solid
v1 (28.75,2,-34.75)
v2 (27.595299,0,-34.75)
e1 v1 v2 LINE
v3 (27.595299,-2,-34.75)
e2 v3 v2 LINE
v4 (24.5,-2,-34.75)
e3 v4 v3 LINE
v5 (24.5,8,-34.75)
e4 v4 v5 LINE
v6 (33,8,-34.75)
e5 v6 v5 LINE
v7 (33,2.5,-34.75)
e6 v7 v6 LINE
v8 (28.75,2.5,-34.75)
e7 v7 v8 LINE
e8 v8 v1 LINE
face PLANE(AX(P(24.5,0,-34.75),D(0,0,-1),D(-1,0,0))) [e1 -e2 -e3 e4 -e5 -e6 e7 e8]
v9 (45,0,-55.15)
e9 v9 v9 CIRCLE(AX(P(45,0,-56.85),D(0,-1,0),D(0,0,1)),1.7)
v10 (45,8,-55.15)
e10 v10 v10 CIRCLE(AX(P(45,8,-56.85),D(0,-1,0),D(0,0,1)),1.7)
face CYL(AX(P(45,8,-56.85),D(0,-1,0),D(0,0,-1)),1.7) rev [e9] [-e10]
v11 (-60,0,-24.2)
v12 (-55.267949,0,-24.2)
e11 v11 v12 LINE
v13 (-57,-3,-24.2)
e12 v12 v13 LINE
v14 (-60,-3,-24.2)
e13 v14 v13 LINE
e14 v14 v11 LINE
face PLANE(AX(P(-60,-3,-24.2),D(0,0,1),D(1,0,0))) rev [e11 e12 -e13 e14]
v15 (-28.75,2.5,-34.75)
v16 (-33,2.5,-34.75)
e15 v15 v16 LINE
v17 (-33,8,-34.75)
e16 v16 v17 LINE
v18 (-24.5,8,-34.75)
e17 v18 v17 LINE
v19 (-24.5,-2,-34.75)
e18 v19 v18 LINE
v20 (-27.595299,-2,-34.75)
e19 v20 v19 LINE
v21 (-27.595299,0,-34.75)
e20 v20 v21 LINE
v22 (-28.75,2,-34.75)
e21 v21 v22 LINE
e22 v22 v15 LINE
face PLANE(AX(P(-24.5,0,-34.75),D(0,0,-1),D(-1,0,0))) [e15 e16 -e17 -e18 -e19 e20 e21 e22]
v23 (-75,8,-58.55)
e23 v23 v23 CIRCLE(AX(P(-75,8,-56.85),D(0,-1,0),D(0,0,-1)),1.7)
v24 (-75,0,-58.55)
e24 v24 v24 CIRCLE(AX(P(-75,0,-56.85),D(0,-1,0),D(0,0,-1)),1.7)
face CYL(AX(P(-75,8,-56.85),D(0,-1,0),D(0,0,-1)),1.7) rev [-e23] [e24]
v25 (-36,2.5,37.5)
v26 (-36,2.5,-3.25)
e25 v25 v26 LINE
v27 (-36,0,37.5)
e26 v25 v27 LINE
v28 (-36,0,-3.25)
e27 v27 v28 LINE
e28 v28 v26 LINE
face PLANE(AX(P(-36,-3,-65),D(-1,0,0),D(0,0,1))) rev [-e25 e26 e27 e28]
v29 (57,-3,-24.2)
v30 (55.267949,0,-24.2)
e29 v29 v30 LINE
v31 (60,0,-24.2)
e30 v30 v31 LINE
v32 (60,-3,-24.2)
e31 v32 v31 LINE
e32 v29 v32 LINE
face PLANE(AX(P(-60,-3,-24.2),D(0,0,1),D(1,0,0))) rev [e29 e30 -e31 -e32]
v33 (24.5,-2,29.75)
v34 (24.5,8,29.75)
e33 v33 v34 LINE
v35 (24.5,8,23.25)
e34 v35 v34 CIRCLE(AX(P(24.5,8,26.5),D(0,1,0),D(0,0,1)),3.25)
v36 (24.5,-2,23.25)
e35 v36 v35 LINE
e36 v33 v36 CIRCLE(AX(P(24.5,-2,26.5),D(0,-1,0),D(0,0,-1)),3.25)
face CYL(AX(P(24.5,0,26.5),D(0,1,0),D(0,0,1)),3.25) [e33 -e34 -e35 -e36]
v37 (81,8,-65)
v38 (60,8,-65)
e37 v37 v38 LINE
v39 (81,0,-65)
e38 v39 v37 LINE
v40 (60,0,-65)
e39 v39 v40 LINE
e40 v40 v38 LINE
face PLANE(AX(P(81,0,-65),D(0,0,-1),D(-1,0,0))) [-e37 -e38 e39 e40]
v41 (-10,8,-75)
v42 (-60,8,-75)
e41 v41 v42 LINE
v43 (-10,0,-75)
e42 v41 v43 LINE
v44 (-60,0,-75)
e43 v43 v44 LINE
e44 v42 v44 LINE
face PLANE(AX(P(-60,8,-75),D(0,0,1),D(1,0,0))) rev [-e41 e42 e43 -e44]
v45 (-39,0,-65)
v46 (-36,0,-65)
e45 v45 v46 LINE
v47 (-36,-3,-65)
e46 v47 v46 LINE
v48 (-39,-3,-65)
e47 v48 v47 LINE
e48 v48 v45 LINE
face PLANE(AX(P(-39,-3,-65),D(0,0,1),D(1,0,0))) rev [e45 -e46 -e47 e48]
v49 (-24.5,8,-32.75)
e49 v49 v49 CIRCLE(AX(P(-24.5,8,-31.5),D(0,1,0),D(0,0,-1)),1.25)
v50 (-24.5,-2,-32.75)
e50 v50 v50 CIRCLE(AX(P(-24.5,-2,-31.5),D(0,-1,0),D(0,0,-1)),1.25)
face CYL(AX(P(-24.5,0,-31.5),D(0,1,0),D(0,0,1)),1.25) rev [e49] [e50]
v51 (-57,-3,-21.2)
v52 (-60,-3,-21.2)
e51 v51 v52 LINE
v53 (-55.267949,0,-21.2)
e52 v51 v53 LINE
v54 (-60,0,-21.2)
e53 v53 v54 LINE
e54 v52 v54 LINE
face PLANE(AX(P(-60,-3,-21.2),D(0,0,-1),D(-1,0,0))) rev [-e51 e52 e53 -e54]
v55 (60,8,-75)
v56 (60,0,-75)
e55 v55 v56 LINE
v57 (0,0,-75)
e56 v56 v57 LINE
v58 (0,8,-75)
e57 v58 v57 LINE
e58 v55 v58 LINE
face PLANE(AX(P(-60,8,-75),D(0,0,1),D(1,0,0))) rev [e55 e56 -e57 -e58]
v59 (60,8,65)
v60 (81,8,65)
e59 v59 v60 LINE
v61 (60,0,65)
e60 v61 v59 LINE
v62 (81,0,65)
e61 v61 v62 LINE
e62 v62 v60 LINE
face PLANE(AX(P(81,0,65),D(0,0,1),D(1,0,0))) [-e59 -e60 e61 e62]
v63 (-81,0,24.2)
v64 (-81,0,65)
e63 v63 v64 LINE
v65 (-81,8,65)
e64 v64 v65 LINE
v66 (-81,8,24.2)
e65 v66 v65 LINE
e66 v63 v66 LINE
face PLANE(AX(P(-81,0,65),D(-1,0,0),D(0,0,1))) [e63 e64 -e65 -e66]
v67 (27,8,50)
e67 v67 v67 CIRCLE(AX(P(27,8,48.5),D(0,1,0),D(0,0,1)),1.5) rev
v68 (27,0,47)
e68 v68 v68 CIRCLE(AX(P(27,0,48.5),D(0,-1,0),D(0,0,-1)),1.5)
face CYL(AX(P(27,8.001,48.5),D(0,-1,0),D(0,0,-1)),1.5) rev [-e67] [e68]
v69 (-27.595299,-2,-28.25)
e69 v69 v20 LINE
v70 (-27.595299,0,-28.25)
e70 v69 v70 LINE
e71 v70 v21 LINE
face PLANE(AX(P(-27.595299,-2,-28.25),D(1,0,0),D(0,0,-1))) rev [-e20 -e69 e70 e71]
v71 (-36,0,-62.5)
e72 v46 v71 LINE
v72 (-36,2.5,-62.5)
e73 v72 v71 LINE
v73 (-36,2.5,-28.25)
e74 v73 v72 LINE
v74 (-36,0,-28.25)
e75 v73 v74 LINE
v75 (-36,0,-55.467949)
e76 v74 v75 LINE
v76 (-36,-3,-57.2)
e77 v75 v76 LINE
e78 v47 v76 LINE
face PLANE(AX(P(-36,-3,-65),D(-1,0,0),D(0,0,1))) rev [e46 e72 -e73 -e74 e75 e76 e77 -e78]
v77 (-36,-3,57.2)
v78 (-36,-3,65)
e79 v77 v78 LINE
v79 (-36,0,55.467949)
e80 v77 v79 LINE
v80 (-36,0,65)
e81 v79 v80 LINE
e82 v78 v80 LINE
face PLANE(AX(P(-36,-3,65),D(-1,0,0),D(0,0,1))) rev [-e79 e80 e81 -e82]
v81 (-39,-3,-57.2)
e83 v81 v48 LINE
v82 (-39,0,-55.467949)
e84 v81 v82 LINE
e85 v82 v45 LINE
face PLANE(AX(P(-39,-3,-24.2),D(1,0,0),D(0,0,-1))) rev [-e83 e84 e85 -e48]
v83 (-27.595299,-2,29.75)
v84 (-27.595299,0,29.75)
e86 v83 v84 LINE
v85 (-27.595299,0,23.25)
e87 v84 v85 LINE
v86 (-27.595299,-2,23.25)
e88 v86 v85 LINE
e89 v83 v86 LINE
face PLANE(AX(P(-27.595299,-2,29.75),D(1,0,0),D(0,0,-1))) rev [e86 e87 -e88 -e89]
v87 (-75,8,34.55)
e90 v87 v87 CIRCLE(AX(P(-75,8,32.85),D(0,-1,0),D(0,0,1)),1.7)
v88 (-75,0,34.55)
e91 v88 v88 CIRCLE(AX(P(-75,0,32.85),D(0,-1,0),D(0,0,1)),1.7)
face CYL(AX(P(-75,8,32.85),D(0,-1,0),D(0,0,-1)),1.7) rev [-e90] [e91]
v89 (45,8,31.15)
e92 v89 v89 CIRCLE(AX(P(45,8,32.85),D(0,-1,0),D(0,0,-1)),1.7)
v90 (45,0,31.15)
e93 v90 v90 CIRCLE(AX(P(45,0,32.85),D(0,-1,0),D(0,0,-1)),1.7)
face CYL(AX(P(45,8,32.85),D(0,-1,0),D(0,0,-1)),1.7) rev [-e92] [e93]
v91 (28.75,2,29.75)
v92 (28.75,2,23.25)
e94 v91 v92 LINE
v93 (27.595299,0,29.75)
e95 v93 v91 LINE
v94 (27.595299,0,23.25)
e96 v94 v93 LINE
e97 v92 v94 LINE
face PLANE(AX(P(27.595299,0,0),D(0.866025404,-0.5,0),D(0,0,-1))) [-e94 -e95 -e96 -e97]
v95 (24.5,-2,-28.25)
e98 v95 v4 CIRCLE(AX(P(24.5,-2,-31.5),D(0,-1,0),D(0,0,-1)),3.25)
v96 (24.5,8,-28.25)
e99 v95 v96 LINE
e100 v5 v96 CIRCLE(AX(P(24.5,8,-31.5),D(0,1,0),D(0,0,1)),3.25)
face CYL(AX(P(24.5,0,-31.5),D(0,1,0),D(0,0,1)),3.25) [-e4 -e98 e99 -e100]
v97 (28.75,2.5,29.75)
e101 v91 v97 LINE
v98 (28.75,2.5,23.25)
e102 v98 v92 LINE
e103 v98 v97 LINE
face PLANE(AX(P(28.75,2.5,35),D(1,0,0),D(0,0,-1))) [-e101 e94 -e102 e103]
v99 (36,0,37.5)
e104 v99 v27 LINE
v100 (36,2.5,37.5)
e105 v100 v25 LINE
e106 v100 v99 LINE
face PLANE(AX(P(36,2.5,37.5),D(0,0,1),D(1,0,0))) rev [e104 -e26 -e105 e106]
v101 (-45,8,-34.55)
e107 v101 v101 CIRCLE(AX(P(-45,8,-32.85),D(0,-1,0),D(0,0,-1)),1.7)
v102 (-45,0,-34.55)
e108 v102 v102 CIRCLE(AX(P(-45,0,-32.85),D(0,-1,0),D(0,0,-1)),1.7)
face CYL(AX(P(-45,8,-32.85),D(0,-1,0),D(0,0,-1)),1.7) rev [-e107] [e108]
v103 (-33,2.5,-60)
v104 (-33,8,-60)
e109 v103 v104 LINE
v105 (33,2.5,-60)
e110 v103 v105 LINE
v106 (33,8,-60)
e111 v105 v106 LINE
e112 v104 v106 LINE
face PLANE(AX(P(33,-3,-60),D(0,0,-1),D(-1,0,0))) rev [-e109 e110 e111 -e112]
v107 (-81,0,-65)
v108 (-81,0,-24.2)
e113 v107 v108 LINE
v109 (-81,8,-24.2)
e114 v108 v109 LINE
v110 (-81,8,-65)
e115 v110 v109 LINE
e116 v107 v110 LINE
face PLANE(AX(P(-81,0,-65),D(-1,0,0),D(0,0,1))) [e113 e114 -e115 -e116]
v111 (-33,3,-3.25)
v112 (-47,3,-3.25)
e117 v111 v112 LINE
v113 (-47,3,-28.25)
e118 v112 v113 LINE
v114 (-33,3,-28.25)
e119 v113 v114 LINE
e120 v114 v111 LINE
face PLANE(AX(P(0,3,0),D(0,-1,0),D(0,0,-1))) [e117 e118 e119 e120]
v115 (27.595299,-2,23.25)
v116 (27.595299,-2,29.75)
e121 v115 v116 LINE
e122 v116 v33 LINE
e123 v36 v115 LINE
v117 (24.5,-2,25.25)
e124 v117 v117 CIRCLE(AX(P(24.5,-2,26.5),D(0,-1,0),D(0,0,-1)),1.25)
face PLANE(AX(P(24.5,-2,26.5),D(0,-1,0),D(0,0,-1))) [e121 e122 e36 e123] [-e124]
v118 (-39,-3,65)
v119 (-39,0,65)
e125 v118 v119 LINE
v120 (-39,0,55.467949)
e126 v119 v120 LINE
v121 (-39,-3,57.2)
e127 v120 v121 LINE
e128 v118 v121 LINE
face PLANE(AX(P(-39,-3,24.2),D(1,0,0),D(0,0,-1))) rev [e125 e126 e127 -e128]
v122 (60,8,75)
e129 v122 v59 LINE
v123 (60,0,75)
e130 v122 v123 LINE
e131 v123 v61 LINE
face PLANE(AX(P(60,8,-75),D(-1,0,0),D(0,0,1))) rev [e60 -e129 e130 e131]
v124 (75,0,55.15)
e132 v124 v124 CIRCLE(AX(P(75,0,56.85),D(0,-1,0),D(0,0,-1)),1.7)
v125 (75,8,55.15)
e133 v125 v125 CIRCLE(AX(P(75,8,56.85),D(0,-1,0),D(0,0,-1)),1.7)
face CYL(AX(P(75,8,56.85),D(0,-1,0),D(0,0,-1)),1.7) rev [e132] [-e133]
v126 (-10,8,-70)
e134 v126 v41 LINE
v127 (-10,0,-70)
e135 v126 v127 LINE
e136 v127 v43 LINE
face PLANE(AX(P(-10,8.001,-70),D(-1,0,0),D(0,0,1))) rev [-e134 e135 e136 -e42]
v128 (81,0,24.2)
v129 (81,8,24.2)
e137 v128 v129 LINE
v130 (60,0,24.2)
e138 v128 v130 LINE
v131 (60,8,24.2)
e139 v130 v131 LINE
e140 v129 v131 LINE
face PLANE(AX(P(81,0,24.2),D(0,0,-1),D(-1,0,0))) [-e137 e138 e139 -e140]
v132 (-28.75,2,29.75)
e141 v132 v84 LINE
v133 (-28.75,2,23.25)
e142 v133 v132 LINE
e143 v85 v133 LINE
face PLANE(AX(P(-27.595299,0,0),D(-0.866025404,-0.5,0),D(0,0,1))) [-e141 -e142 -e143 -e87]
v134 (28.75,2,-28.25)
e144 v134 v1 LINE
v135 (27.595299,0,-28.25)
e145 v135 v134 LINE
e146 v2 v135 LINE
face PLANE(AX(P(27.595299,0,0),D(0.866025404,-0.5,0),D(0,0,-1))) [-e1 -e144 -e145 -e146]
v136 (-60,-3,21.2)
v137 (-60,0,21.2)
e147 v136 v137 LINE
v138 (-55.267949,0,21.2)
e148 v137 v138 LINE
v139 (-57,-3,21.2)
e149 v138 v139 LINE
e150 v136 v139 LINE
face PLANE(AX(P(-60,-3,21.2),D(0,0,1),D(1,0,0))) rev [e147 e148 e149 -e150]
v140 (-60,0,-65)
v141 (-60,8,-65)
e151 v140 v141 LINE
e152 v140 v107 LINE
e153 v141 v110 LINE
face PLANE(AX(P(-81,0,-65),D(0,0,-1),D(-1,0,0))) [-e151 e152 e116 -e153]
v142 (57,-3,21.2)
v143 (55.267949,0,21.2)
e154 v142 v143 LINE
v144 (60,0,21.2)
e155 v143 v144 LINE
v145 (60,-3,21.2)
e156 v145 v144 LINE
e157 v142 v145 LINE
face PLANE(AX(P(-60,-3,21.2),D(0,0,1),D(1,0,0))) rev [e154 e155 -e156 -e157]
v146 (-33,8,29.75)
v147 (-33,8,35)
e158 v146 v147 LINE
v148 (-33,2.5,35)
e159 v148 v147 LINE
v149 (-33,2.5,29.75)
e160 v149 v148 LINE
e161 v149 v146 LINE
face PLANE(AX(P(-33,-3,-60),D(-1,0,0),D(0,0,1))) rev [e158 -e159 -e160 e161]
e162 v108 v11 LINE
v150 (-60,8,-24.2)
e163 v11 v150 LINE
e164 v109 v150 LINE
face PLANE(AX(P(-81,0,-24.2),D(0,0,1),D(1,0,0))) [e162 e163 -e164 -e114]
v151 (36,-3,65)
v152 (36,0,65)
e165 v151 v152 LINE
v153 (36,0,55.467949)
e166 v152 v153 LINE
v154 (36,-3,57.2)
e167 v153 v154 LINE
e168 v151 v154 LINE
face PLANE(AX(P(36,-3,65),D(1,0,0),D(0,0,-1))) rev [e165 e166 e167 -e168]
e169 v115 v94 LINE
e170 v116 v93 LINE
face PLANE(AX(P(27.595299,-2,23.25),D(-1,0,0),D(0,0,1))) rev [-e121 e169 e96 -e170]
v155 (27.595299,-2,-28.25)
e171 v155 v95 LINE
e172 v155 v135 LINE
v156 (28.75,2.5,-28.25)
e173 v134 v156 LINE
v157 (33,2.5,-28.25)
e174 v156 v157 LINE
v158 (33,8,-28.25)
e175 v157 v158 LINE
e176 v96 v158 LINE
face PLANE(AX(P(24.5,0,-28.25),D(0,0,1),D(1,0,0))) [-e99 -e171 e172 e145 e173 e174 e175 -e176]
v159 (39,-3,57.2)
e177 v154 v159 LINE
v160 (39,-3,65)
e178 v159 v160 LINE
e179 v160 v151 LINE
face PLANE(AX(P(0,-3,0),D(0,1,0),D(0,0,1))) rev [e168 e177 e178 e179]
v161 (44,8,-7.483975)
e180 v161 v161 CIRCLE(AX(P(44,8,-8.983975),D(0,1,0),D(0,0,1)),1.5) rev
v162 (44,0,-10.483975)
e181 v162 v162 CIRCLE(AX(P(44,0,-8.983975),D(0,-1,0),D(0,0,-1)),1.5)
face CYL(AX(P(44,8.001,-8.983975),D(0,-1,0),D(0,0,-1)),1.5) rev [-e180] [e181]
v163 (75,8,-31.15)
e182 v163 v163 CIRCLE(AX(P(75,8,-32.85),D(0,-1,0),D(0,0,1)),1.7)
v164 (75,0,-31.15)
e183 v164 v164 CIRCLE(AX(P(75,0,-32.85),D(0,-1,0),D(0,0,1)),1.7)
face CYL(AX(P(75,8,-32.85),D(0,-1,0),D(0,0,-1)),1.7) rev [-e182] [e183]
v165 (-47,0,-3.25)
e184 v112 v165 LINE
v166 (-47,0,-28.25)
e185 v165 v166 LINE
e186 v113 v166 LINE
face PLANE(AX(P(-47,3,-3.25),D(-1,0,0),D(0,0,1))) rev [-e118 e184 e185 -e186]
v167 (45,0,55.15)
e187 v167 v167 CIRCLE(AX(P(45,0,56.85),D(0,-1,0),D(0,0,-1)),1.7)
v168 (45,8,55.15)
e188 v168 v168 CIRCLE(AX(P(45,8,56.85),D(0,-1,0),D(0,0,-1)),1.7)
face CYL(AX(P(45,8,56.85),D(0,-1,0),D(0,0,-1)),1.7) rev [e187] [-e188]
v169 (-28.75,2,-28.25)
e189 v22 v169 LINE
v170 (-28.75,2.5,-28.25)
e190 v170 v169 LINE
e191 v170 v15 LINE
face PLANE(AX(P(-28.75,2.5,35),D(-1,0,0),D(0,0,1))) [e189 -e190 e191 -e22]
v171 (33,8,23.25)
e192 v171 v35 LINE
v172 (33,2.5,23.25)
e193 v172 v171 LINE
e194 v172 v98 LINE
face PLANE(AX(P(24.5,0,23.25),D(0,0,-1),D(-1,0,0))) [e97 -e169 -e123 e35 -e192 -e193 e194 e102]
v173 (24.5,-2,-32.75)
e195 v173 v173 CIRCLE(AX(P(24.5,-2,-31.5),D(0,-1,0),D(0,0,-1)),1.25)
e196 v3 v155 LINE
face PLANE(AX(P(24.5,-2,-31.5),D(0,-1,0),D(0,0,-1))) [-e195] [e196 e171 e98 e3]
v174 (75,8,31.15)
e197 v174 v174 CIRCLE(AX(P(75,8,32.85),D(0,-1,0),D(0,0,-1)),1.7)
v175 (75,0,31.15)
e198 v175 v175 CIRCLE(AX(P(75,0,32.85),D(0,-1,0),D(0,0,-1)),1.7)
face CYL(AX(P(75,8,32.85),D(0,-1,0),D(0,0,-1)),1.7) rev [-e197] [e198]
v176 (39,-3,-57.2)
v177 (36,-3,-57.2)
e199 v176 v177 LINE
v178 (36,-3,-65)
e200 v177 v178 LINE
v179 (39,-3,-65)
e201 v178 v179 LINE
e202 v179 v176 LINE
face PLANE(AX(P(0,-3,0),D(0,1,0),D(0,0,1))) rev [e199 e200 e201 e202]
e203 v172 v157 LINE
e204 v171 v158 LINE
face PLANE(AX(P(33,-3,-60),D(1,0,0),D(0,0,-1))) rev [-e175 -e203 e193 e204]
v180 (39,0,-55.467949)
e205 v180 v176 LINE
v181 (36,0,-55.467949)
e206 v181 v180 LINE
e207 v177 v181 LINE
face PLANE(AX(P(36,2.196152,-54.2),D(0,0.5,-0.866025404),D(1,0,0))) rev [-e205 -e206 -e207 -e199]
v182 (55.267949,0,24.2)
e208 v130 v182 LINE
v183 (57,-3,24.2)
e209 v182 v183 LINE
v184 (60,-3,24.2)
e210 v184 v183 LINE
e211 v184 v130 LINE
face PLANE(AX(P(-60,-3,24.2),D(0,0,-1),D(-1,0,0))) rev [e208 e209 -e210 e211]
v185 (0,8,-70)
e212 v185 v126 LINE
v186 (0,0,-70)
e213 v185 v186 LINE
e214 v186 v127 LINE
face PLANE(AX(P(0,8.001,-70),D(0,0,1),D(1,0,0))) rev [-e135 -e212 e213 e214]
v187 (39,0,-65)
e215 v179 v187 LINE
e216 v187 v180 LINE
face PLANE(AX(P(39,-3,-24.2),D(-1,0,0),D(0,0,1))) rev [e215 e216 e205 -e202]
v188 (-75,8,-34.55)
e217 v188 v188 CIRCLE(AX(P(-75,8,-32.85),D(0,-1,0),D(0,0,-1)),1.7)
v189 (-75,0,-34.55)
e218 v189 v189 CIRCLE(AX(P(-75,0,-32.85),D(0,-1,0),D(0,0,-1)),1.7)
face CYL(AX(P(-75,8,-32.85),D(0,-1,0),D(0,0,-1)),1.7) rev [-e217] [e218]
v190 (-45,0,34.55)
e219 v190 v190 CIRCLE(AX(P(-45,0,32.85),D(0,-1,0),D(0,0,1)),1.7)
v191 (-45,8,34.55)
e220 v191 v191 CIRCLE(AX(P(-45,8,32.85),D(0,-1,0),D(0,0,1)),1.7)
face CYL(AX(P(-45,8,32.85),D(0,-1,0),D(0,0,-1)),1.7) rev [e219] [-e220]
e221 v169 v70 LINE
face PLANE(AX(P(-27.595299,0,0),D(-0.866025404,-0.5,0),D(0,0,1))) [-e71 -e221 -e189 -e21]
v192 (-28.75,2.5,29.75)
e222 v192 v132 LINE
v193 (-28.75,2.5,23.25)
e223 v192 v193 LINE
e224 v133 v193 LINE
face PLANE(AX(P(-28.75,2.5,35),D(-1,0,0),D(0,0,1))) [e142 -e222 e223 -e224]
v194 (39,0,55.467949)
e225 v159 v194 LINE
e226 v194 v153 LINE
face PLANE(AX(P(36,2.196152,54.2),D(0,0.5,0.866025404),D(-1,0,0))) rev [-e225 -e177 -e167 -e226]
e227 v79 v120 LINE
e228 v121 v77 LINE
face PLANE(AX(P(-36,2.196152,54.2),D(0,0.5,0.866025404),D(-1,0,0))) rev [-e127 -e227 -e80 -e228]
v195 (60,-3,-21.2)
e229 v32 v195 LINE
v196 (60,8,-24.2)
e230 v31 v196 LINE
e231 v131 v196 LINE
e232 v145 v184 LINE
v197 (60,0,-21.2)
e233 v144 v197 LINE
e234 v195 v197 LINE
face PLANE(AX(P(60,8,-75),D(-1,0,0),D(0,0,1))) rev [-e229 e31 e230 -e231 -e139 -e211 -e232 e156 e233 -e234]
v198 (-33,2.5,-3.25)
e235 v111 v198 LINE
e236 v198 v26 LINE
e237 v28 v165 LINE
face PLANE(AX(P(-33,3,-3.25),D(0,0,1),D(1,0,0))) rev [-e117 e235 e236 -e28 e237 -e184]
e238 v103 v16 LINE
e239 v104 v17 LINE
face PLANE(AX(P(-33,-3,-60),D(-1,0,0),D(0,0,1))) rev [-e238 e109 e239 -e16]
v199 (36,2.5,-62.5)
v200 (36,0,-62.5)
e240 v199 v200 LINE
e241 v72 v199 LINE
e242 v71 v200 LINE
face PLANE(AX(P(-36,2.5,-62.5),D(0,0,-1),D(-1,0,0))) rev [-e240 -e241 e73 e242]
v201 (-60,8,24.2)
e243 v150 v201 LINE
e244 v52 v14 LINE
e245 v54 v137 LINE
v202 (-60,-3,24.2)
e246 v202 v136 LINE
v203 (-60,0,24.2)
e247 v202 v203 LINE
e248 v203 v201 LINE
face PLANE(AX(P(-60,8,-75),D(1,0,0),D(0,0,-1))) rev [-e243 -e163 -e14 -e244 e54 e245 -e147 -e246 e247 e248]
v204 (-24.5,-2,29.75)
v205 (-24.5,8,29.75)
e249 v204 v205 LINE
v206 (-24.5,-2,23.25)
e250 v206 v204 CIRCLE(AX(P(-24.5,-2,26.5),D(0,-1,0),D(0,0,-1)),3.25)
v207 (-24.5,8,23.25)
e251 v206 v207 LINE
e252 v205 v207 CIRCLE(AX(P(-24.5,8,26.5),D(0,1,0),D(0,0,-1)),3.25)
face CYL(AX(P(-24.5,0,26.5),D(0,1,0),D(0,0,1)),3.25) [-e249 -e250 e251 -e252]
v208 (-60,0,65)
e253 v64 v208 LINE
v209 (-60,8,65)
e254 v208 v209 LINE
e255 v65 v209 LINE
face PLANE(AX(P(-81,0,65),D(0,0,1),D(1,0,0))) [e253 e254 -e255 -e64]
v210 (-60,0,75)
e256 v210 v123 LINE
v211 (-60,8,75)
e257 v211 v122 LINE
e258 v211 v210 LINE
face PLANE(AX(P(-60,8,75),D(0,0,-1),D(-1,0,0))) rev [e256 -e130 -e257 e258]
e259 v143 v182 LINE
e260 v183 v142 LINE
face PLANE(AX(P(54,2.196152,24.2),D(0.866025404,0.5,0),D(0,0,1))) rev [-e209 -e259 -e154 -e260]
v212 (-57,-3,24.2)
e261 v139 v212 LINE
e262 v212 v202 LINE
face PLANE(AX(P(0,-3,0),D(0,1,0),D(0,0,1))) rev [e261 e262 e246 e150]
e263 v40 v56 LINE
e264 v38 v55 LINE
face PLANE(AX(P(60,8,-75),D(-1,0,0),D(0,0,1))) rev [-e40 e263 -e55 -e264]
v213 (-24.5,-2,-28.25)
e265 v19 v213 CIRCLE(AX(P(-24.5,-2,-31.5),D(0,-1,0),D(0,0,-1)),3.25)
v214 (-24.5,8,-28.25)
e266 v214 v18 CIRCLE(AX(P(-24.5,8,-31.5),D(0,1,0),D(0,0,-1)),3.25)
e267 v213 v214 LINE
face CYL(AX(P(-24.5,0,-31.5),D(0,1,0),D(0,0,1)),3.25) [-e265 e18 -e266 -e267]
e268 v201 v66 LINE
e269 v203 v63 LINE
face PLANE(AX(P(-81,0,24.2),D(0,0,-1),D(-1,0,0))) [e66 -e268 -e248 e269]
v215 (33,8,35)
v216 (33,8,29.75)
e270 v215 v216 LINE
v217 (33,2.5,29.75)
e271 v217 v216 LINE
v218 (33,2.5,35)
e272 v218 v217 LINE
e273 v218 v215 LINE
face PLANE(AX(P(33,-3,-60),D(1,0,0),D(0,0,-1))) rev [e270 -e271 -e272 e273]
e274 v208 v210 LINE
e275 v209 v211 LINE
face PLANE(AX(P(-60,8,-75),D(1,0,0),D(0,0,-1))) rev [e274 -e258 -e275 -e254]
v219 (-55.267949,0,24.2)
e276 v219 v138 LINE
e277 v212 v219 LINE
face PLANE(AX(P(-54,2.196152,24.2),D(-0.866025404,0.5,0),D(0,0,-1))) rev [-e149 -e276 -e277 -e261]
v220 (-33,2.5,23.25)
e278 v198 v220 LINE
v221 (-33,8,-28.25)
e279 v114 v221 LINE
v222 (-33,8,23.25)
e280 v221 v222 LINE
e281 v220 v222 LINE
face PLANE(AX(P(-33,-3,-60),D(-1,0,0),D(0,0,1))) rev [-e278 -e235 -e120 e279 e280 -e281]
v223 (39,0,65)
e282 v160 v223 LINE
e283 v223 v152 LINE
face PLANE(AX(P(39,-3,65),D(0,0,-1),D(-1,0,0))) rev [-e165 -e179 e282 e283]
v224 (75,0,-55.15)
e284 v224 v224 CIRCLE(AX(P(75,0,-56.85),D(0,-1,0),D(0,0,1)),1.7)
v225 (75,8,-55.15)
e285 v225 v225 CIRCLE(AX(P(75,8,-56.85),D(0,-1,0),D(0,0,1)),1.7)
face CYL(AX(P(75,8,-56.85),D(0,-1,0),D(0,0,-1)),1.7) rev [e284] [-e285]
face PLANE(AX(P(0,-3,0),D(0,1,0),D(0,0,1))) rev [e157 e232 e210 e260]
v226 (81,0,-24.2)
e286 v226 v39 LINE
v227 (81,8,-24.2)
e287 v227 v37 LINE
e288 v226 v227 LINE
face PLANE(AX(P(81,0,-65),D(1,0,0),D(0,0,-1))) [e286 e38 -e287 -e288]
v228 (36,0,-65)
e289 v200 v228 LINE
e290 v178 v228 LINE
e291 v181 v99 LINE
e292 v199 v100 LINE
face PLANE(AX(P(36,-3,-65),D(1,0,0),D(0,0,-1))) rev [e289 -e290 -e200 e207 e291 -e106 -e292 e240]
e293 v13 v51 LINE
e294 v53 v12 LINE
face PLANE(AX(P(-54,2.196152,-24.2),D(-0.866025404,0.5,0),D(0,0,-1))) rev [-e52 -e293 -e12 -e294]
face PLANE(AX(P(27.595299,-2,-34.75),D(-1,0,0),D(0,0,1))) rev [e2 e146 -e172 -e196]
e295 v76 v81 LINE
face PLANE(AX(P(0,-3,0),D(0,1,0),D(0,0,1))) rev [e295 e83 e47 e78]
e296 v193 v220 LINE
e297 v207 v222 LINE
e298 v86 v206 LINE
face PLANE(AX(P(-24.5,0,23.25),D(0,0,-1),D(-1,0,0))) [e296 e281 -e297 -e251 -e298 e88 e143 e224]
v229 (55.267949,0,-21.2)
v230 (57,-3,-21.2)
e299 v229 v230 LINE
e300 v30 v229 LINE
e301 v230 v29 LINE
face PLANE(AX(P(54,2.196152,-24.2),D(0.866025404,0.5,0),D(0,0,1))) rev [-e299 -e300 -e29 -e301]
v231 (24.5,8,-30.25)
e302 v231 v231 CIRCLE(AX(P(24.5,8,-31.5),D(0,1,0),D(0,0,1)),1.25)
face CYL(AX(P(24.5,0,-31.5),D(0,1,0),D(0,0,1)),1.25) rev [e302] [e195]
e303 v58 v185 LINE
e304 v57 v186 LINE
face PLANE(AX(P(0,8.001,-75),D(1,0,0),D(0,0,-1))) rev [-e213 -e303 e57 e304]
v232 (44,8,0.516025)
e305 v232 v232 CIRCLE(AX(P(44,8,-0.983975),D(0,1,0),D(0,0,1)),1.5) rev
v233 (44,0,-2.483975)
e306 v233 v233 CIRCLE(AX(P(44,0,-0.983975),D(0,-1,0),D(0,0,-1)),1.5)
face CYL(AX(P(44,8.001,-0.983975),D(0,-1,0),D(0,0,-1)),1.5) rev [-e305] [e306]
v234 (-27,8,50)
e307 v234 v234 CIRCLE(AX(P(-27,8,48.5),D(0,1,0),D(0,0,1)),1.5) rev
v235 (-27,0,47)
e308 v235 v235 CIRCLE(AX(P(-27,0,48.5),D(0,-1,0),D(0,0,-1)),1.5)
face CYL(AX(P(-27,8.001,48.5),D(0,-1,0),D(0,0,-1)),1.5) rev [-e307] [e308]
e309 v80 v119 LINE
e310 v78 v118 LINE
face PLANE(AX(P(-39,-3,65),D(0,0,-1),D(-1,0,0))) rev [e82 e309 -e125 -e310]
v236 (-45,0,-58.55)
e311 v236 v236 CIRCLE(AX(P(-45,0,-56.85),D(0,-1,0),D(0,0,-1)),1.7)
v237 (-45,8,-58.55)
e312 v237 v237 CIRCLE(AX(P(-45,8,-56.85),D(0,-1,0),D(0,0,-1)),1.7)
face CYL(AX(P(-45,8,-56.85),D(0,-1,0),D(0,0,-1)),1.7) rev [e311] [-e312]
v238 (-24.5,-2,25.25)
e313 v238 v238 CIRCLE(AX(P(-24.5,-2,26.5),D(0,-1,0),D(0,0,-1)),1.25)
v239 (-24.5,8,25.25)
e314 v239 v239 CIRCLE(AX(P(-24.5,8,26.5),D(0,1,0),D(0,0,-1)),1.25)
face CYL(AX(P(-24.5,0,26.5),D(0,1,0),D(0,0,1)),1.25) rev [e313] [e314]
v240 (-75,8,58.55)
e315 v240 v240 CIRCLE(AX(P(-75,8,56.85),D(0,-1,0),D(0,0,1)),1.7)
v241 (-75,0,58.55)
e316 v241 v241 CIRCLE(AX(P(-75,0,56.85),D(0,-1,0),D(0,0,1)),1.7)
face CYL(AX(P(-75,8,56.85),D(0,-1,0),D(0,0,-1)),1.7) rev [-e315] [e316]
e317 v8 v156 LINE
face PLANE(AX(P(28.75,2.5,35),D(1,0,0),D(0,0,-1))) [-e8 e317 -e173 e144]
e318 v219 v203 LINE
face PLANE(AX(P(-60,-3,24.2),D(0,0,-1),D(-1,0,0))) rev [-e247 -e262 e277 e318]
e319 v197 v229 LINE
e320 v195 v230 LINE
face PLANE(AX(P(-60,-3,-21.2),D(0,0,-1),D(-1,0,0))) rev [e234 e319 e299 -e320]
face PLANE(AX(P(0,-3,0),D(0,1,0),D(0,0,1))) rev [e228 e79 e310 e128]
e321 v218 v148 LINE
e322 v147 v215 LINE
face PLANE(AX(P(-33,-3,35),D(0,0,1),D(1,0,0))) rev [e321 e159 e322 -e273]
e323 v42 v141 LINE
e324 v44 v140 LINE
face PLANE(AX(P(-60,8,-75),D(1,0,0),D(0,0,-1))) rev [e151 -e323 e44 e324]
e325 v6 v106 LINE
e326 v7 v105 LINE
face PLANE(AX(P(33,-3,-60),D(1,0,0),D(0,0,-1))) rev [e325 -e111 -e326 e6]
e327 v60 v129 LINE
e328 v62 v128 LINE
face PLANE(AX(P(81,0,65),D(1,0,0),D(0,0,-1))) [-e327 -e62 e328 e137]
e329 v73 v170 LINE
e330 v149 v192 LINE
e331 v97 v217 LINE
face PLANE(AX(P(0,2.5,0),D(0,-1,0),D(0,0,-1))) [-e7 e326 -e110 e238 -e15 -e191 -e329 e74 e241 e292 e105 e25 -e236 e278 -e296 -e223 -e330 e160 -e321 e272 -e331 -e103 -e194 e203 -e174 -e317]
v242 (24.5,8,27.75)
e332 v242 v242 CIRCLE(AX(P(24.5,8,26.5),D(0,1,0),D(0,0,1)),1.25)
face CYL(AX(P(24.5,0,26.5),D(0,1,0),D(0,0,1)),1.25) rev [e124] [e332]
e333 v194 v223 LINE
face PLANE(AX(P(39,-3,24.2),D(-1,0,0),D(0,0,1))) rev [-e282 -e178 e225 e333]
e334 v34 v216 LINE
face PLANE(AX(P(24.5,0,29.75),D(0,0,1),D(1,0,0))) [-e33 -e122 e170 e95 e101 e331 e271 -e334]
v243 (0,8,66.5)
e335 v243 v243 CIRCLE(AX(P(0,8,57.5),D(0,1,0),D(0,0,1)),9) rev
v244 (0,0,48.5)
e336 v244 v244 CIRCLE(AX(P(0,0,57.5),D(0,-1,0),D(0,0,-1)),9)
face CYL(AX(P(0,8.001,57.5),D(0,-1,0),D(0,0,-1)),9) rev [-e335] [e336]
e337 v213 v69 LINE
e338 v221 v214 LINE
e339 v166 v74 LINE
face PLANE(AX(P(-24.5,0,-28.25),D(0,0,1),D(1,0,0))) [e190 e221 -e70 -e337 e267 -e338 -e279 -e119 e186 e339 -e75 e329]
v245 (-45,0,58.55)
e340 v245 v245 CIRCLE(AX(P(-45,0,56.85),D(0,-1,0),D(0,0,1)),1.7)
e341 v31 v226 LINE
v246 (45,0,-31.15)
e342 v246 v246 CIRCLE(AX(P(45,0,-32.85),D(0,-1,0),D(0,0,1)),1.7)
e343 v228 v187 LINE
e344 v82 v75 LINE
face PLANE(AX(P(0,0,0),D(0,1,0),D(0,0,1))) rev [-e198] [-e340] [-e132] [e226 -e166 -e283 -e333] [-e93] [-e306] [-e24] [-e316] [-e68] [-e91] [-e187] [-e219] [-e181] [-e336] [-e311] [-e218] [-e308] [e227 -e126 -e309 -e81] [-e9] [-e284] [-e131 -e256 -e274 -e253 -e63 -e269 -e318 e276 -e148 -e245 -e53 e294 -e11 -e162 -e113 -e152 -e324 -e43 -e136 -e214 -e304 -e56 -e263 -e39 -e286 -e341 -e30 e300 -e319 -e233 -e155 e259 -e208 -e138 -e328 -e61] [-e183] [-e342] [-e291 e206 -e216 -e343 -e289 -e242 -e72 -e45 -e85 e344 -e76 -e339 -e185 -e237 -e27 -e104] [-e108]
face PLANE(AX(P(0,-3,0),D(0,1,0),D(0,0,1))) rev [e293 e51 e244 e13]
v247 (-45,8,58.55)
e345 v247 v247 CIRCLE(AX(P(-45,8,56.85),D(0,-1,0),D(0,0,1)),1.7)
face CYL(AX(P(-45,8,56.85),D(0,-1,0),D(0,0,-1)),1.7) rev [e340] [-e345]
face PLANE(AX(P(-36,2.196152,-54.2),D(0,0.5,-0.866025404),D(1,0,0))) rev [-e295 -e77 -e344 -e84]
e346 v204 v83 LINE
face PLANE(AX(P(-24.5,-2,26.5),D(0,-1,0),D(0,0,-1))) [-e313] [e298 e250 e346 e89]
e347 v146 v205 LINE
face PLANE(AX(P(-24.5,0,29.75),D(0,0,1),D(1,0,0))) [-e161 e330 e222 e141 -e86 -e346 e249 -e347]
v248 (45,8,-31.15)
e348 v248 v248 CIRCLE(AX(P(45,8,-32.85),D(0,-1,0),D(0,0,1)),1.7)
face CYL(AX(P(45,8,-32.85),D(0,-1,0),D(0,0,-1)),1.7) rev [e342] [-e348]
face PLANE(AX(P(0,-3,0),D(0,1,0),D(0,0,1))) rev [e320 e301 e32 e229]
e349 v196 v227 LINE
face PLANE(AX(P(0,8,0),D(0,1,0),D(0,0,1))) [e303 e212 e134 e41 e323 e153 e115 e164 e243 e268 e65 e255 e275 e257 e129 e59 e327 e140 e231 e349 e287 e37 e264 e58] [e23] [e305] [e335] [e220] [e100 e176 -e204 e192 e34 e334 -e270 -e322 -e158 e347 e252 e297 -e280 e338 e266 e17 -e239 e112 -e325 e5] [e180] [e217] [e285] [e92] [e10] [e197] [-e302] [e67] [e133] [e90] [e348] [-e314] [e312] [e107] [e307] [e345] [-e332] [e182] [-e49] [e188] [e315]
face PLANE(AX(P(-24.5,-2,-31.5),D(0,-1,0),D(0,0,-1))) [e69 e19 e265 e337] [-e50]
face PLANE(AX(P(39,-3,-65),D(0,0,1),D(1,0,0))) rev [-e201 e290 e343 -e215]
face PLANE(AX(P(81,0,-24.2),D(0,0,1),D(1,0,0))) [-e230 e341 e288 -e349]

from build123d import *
from OCP.BRepFilletAPI import BRepFilletAPI_MakeChamfer

# Parameters (mm, degrees)
SKETCH_1_W          = 120
SKETCH_1_H          = 150
EXTRUDE_1_DEPTH     = 8
SKETCH_3_W          = 120
SKETCH_3_H          = 3
EXTRUDE_2_DEPTH     = 3
SKETCH_5_W          = 66
SKETCH_5_H          = 95
CUT_EXTRUDE_1_DEPTH = 97.674712309
SKETCH_6_W          = 3
SKETCH_6_H          = 40.8
EXTRUDE_3_DEPTH     = 3
SKETCH_7_W          = 21
SKETCH_7_H          = 40.8
EXTRUDE_4_DEPTH     = 8
SKETCH_8_R          = 1.7
CUT_EXTRUDE_2_DEPTH = 8
SKETCH_9_R          = 1.25
EXTRUDE_5_DEPTH     = 8
SKETCH_10_W         = 66
SKETCH_10_H         = 20
EXTRUDE_6_DEPTH     = 2
CUT_EXTRUDE_3_DEPTH = 3
CUT_EXTRUDE_4_REACH = 112.756
SKETCH_12_W         = 66
SKETCH_12_H         = 20
SKETCH_13_W         = 72
SKETCH_13_H         = 100
SKETCH_13_W_2       = 57.5
SKETCH_13_H_2       = 95
CUT_EXTRUDE_5_DEPTH = 2.5
CHAMFER_1_SIZE      = 2
CHAMFER_1_SIZE2     = 1.154700538
CHAMFER_2_SIZE      = 5.196152423
CHAMFER_2_SIZE_2    = 3
SKETCH_14_W         = 14
SKETCH_14_H         = 25
CUT_EXTRUDE_6_DEPTH = 3
SKETCH_15_R         = 1.25
EXTRUDE_8_DEPTH     = 2
CUT_EXTRUDE_7_REACH = 112.68
SKETCH_16_R         = 9
SKETCH_16_W         = 10
SKETCH_16_H         = 5
CUT_EXTRUDE_8_REACH = 112.68
SKETCH_17_R         = 1.5
CUT_EXTRUDE_9_REACH = 112.68
SKETCH_18_R         = 1.5


with BuildPart() as part:
    # 草图1 → 凸台-拉伸1 (new body)
    with BuildSketch(Plane(origin=(0, 0, 0), x_dir=(1, 0, 0), z_dir=(0, 1, 0))):
        Rectangle(SKETCH_1_W, SKETCH_1_H)
    extrude(amount=EXTRUDE_1_DEPTH)

    # 草图3 → 凸台-拉伸2 (add)
    with BuildSketch(Plane.XZ):
        with Locations((0, 22.7)):
            Rectangle(SKETCH_3_W, SKETCH_3_H)
        with Locations((0, -22.7)):
            Rectangle(SKETCH_3_W, SKETCH_3_H)
    extrude(amount=EXTRUDE_2_DEPTH)

    # 草图5 → 切除-拉伸1 (cut, through all)
    with BuildSketch(Plane(origin=(0, 8, 0), x_dir=(1, 0, 0), z_dir=(0, 1, 0))):
        with Locations((0, 12.5)):
            Rectangle(SKETCH_5_W, SKETCH_5_H)
    extrude(amount=-CUT_EXTRUDE_1_DEPTH, mode=Mode.SUBTRACT)

    # 草图6 → 凸台-拉伸3 (add)
    with BuildSketch(Plane.XZ):
        with Locations((-37.5, -44.6)):
            Rectangle(SKETCH_6_W, SKETCH_6_H)
        with Locations((37.5, -44.6)):
            Rectangle(SKETCH_6_W, SKETCH_6_H)
        with Locations((37.5, 44.6)):
            Rectangle(SKETCH_6_W, SKETCH_6_H)
        with Locations((-37.5, 44.6)):
            Rectangle(SKETCH_6_W, SKETCH_6_H)
    extrude(amount=EXTRUDE_3_DEPTH)

    # 草图7 → 凸台-拉伸4 (add)
    with BuildSketch(Plane(origin=(0, 8, 0), x_dir=(1, 0, 0), z_dir=(0, 1, 0))):
        with Locations((-70.5, 44.6)):
            Rectangle(SKETCH_7_W, SKETCH_7_H)
        with Locations((70.5, 44.6)):
            Rectangle(SKETCH_7_W, SKETCH_7_H)
        with Locations((70.5, -44.6)):
            Rectangle(SKETCH_7_W, SKETCH_7_H)
        with Locations((-70.5, -44.6)):
            Rectangle(SKETCH_7_W, SKETCH_7_H)
    extrude(amount=-EXTRUDE_4_DEPTH)

    # 草图8 → 切除-拉伸2 (cut)
    with BuildSketch(Plane.XZ):
        with Locations(Location((-75, -32.85, 0), (0, 0, 270))):
            Circle(SKETCH_8_R)
        with Locations(Location((-45, -32.85, 0), (0, 0, 270))):
            Circle(SKETCH_8_R)
        with Locations(Location((-75, -56.85, 0), (0, 0, 270))):
            Circle(SKETCH_8_R)
        with Locations(Location((-45, -56.85, 0), (0, 0, 270))):
            Circle(SKETCH_8_R)
        with Locations(Location((45, -56.85, 0), (0, 0, 90))):
            Circle(SKETCH_8_R)
        with Locations(Location((75, -56.85, 0), (0, 0, 90))):
            Circle(SKETCH_8_R)
        with Locations(Location((45, -32.85, 0), (0, 0, 90))):
            Circle(SKETCH_8_R)
        with Locations(Location((75, -32.85, 0), (0, 0, 90))):
            Circle(SKETCH_8_R)
        with Locations(Location((75, 32.85, 0), (0, 0, 270))):
            Circle(SKETCH_8_R)
        with Locations(Location((45, 32.85, 0), (0, 0, 270))):
            Circle(SKETCH_8_R)
        with Locations(Location((75, 56.85, 0), (0, 0, 270))):
            Circle(SKETCH_8_R)
        with Locations(Location((45, 56.85, 0), (0, 0, 270))):
            Circle(SKETCH_8_R)
        with Locations(Location((-45, 56.85, 0), (0, 0, 90))):
            Circle(SKETCH_8_R)
        with Locations(Location((-75, 56.85, 0), (0, 0, 90))):
            Circle(SKETCH_8_R)
        with Locations(Location((-45, 32.85, 0), (0, 0, 90))):
            Circle(SKETCH_8_R)
        with Locations(Location((-75, 32.85, 0), (0, 0, 90))):
            Circle(SKETCH_8_R)
    extrude(amount=-CUT_EXTRUDE_2_DEPTH, mode=Mode.SUBTRACT)

    # 草图9 → 凸台-拉伸5 (add)
    # profile 1 of 4: a face of its own
    with BuildSketch(Plane(origin=(0, 8, 0), x_dir=(1, 0, 0), z_dir=(0, 1, 0))):
        with BuildLine():
            Line((24.5, 34.75), (33, 34.75))
            Line((33, 34.75), (33, 28.25))
            Line((33, 28.25), (24.5, 28.25))
            ThreePointArc((24.5, 28.25), (21.25, 31.5), (24.5, 34.75))
        make_face()
        with Locations(Location((24.5, 31.5, 0), (0, 0, 270))):
            Circle(SKETCH_9_R, mode=Mode.SUBTRACT)
    # profile 2 of 4: a face of its own
    with BuildSketch(Plane(origin=(0, 8, 0), x_dir=(1, 0, 0), z_dir=(0, 1, 0))):
        with BuildLine():
            Line((24.5, -23.25), (33, -23.25))
            Line((33, -23.25), (33, -29.75))
            Line((33, -29.75), (24.5, -29.75))
            ThreePointArc((24.5, -29.75), (21.25, -26.5), (24.5, -23.25))
        make_face()
        with Locations(Location((24.5, -26.5, 0), (0, 0, 270))):
            Circle(SKETCH_9_R, mode=Mode.SUBTRACT)
    # profile 3 of 4: a face of its own
    with BuildSketch(Plane(origin=(0, 8, 0), x_dir=(1, 0, 0), z_dir=(0, 1, 0))):
        with BuildLine():
            Line((-24.5, -23.25), (-33, -23.25))
            Line((-33, -23.25), (-33, -29.75))
            Line((-33, -29.75), (-24.5, -29.75))
            ThreePointArc((-24.5, -29.75), (-21.25, -26.5), (-24.5, -23.25))
        make_face()
        with Locations(Location((-24.5, -26.5, 0), (0, 0, 90))):
            Circle(SKETCH_9_R, mode=Mode.SUBTRACT)
    # profile 4 of 4: a face of its own
    with BuildSketch(Plane(origin=(0, 8, 0), x_dir=(1, 0, 0), z_dir=(0, 1, 0))):
        with BuildLine():
            Line((-24.5, 34.75), (-33, 34.75))
            Line((-33, 34.75), (-33, 28.25))
            Line((-33, 28.25), (-24.5, 28.25))
            ThreePointArc((-24.5, 28.25), (-21.25, 31.5), (-24.5, 34.75))
        make_face()
        with Locations(Location((-24.5, 31.5, 0), (0, 0, 90))):
            Circle(SKETCH_9_R, mode=Mode.SUBTRACT)
    extrude(amount=-EXTRUDE_5_DEPTH)

    # 草图10 → 凸台-拉伸6 (add)
    with BuildSketch(Plane(origin=(0, 8, 0), x_dir=(1, 0, 0), z_dir=(0, 1, 0))):
        with Locations((0, 50)):
            Rectangle(SKETCH_10_W, SKETCH_10_H)
    extrude(amount=-EXTRUDE_6_DEPTH)

    # 草图11 → 切除-拉伸3 (cut)
    with BuildSketch(Plane.XZ.offset(3)):
        Polygon((-39, -24.2), (-54, -24.2), (-54, -21.2), (-33, -21.2), (-33, -24.2), (-36, -24.2), (-36, -54.2), (-39, -54.2), align=None)
        Polygon((-36, 54.2), (-39, 54.2), (-39, 24.2), (-54, 24.2), (-54, 21.2), (-33, 21.2), (-33, 24.2), (-36, 24.2), align=None)
        Polygon((36, 24.2), (36, 54.2), (39, 54.2), (39, 24.2), (54, 24.2), (54, 21.2), (33, 21.2), (33, 24.2), align=None)
        Polygon((36, -54.2), (39, -54.2), (39, -24.2), (54, -24.2), (54, -21.2), (33, -21.2), (33, -24.2), (36, -24.2), align=None)
    extrude(amount=-CUT_EXTRUDE_3_DEPTH, mode=Mode.SUBTRACT)

    # 草图12 → 切除-拉伸4 (cut, up to next)
    with BuildSketch(Plane.XZ.offset(-6), mode=Mode.PRIVATE) as cut_extrude_4_sk1:
        with Locations((0, -50)):
            Rectangle(SKETCH_12_W, SKETCH_12_H)
    cut_extrude_4_tool1 = extrude(cut_extrude_4_sk1.sketch, amount=-CUT_EXTRUDE_4_REACH, mode=Mode.PRIVATE) & part.part
    add(cut_extrude_4_tool1.solids().sort_by_distance((0, 6, -50))[0], mode=Mode.SUBTRACT)

    # 草图13 → 切除-拉伸5 (cut)
    with BuildSketch(Plane.XZ):
        with Locations((0, -12.5)):
            Rectangle(SKETCH_13_W, SKETCH_13_H)
        with Locations((0, -12.5)):
            Rectangle(SKETCH_13_W_2, SKETCH_13_H_2, mode=Mode.SUBTRACT)
    extrude(amount=-CUT_EXTRUDE_5_DEPTH, mode=Mode.SUBTRACT)

    # 倒角1: one chamfer whose edges measure the first distance from different faces: ONE call of the kernel's chamfer builder (chamfer() names one face for all edges)
    chamfer_1_edges_1 = [part.edges().sort_by_distance(p)[0] for p in [
        (28.75, 0, -31.5),
    ]]
    chamfer_1_side_1 = [part.faces().sort_by_distance(p)[0] for p in [
        (28.75, 1.25, -31.5),
    ]]
    chamfer_1_edges_2 = [part.edges().sort_by_distance(p)[0] for p in [
        (-28.75, 0, 26.5),
    ]]
    chamfer_1_side_2 = [part.faces().sort_by_distance(p)[0] for p in [
        (-28.75, 1.25, 26.5),
    ]]
    chamfer_1_edges_3 = [part.edges().sort_by_distance(p)[0] for p in [
        (28.75, 0, 26.5),
    ]]
    chamfer_1_side_3 = [part.faces().sort_by_distance(p)[0] for p in [
        (28.75, 1.25, 26.5),
    ]]
    chamfer_1_edges_4 = [part.edges().sort_by_distance(p)[0] for p in [
        (-28.75, 0, -31.5),
    ]]
    chamfer_1_side_4 = [part.faces().sort_by_distance(p)[0] for p in [
        (-28.75, 1.25, -31.5),
    ]]
    chamfer_1 = BRepFilletAPI_MakeChamfer(part.part.solid().wrapped)
    for e in chamfer_1_edges_1:
        chamfer_1.Add(CHAMFER_1_SIZE, CHAMFER_1_SIZE2, e.wrapped, chamfer_1_side_1[0].wrapped)  # the first distance lies on this face
    for e in chamfer_1_edges_2:
        chamfer_1.Add(CHAMFER_1_SIZE, CHAMFER_1_SIZE2, e.wrapped, chamfer_1_side_2[0].wrapped)  # the first distance lies on this face
    for e in chamfer_1_edges_3:
        chamfer_1.Add(CHAMFER_1_SIZE, CHAMFER_1_SIZE2, e.wrapped, chamfer_1_side_3[0].wrapped)  # the first distance lies on this face
    for e in chamfer_1_edges_4:
        chamfer_1.Add(CHAMFER_1_SIZE, CHAMFER_1_SIZE2, e.wrapped, chamfer_1_side_4[0].wrapped)  # the first distance lies on this face
    add(Compound.cast(chamfer_1.Shape()), mode=Mode.REPLACE)

    # 倒角2
    # the kernel refuses this chamfer: 5.196152423, 3 mm, written as the material it takes off along each edge
    with BuildSketch(Plane(origin=(22.557108088, -3, 54.2), x_dir=(0, 0.9998132206222079, -0.01932676561270102), z_dir=(1, 0, 0))) as chamfer_2_piece_1_section:
        Polygon((CHAMFER_2_SIZE * 0.999813220566, CHAMFER_2_SIZE * 0.0193267656116), (-CHAMFER_2_SIZE_2 * 0.0193267656127, CHAMFER_2_SIZE_2 * 0.999813220622), (0, 0), align=None)
    chamfer_2_piece_1 = extrude(amount=29.885783824, mode=Mode.PRIVATE)
    chamfer_2_piece_1 = split(chamfer_2_piece_1, bisect_by=Plane(origin=(37.5, 0, 55.319508443), z_dir=(0, -1, 0)), keep=Keep.TOP, mode=Mode.PRIVATE)
    add(chamfer_2_piece_1, mode=Mode.SUBTRACT)
    with BuildSketch(Plane(origin=(54, -3, 37.642891912), x_dir=(0.9983227437537926, -0.057893862402671296, 0), z_dir=(0, 0, -1))) as chamfer_2_piece_2_section:
        Polygon((CHAMFER_2_SIZE_2 * 0.998322743754, -CHAMFER_2_SIZE_2 * 0.0578938624027), (-CHAMFER_2_SIZE * 0.0578938623994, -CHAMFER_2_SIZE * 0.998322743697), (0, 0), align=None)
    chamfer_2_piece_2 = extrude(amount=29.885783824, mode=Mode.PRIVATE)
    chamfer_2_piece_2 = split(chamfer_2_piece_2, bisect_by=Plane(origin=(55.119508443, 0, 22.7), z_dir=(0, -1, 0)), keep=Keep.TOP, mode=Mode.PRIVATE)
    add(chamfer_2_piece_2, mode=Mode.SUBTRACT)
    with BuildSketch(Plane(origin=(54, -3, -37.642891912), x_dir=(0.9983227437537926, -0.057893862402671296, 0), z_dir=(0, 0, 1))) as chamfer_2_piece_3_section:
        Polygon((CHAMFER_2_SIZE_2 * 0.998322743754, CHAMFER_2_SIZE_2 * 0.0578938624027), (-CHAMFER_2_SIZE * 0.0578938623994, CHAMFER_2_SIZE * 0.998322743697), (0, 0), align=None)
    chamfer_2_piece_3 = extrude(amount=29.885783824, mode=Mode.PRIVATE)
    chamfer_2_piece_3 = split(chamfer_2_piece_3, bisect_by=Plane(origin=(55.119508443, 0, -22.7), z_dir=(0, -1, 0)), keep=Keep.TOP, mode=Mode.PRIVATE)
    add(chamfer_2_piece_3, mode=Mode.SUBTRACT)
    with BuildSketch(Plane(origin=(22.557108088, -3, -54.2), x_dir=(0, 0.9998132206222079, 0.01932676561270102), z_dir=(1, 0, 0))) as chamfer_2_piece_4_section:
        Polygon((CHAMFER_2_SIZE * 0.999813220566, -CHAMFER_2_SIZE * 0.0193267656116), (-CHAMFER_2_SIZE_2 * 0.0193267656127, -CHAMFER_2_SIZE_2 * 0.999813220622), (0, 0), align=None)
    chamfer_2_piece_4 = extrude(amount=29.885783824, mode=Mode.PRIVATE)
    chamfer_2_piece_4 = split(chamfer_2_piece_4, bisect_by=Plane(origin=(37.5, 0, -55.319508443), z_dir=(0, -1, 0)), keep=Keep.TOP, mode=Mode.PRIVATE)
    add(chamfer_2_piece_4, mode=Mode.SUBTRACT)
    with BuildSketch(Plane(origin=(-22.557108088, -3, -54.2), x_dir=(0, -0.057893862402671296, -0.9983227437537926), z_dir=(-1, 0, 0))) as chamfer_2_piece_5_section:
        Polygon((CHAMFER_2_SIZE_2 * 0.998322743754, -CHAMFER_2_SIZE_2 * 0.0578938624027), (-CHAMFER_2_SIZE * 0.0578938623994, -CHAMFER_2_SIZE * 0.998322743697), (0, 0), align=None)
    chamfer_2_piece_5 = extrude(amount=29.885783824, mode=Mode.PRIVATE)
    chamfer_2_piece_5 = split(chamfer_2_piece_5, bisect_by=Plane(origin=(-37.5, 0, -55.319508443), z_dir=(0, -1, 0)), keep=Keep.TOP, mode=Mode.PRIVATE)
    add(chamfer_2_piece_5, mode=Mode.SUBTRACT)
    with BuildSketch(Plane(origin=(-54, -3, -37.642891912), x_dir=(-0.9983227437537926, -0.057893862402671296, 0), z_dir=(0, 0, 1))) as chamfer_2_piece_6_section:
        Polygon((CHAMFER_2_SIZE_2 * 0.998322743754, -CHAMFER_2_SIZE_2 * 0.0578938624027), (-CHAMFER_2_SIZE * 0.0578938623994, -CHAMFER_2_SIZE * 0.998322743697), (0, 0), align=None)
    chamfer_2_piece_6 = extrude(amount=29.885783824, mode=Mode.PRIVATE)
    chamfer_2_piece_6 = split(chamfer_2_piece_6, bisect_by=Plane(origin=(-55.119508443, 0, -22.7), z_dir=(0, -1, 0)), keep=Keep.TOP, mode=Mode.PRIVATE)
    add(chamfer_2_piece_6, mode=Mode.SUBTRACT)
    with BuildSketch(Plane(origin=(-54, -3, 37.642891912), x_dir=(-0.9983227437537926, -0.057893862402671296, 0), z_dir=(0, 0, -1))) as chamfer_2_piece_7_section:
        Polygon((CHAMFER_2_SIZE_2 * 0.998322743754, CHAMFER_2_SIZE_2 * 0.0578938624027), (-CHAMFER_2_SIZE * 0.0578938623994, CHAMFER_2_SIZE * 0.998322743697), (0, 0), align=None)
    chamfer_2_piece_7 = extrude(amount=29.885783824, mode=Mode.PRIVATE)
    chamfer_2_piece_7 = split(chamfer_2_piece_7, bisect_by=Plane(origin=(-55.119508443, 0, 22.7), z_dir=(0, -1, 0)), keep=Keep.TOP, mode=Mode.PRIVATE)
    add(chamfer_2_piece_7, mode=Mode.SUBTRACT)
    with BuildSketch(Plane(origin=(-22.557108088, -3, 54.2), x_dir=(0, 0.9998132206222079, -0.01932676561270102), z_dir=(-1, 0, 0))) as chamfer_2_piece_8_section:
        Polygon((CHAMFER_2_SIZE * 0.999813220566, -CHAMFER_2_SIZE * 0.0193267656116), (-CHAMFER_2_SIZE_2 * 0.0193267656127, -CHAMFER_2_SIZE_2 * 0.999813220622), (0, 0), align=None)
    chamfer_2_piece_8 = extrude(amount=29.885783824, mode=Mode.PRIVATE)
    chamfer_2_piece_8 = split(chamfer_2_piece_8, bisect_by=Plane(origin=(-37.5, 0, 55.319508443), z_dir=(0, -1, 0)), keep=Keep.TOP, mode=Mode.PRIVATE)
    add(chamfer_2_piece_8, mode=Mode.SUBTRACT)

    # 草图14 → 切除-拉伸6 (cut)
    with BuildSketch(Plane.XZ):
        with Locations((-40, -15.75)):
            Rectangle(SKETCH_14_W, SKETCH_14_H)
    extrude(amount=-CUT_EXTRUDE_6_DEPTH, mode=Mode.SUBTRACT)

    # 草图15 → 凸台-拉伸8 (add)
    # profile 1 of 4: a face of its own
    with BuildSketch(Plane.XZ):
        with BuildLine():
            Line((-24.5, -28.25), (-27.595299462, -28.25))
            Line((-27.595299462, -28.25), (-27.595299462, -34.75))
            Line((-27.595299462, -34.75), (-24.5, -34.75))
            ThreePointArc((-24.5, -34.75), (-21.25, -31.5), (-24.5, -28.25))
        make_face()
        with Locations(Location((-24.5, -31.5, 0), (0, 0, 270))):
            Circle(SKETCH_15_R, mode=Mode.SUBTRACT)
    # profile 2 of 4: a face of its own
    with BuildSketch(Plane.XZ):
        with BuildLine():
            Line((-24.5, 29.75), (-27.595299462, 29.75))
            Line((-27.595299462, 29.75), (-27.595299462, 23.25))
            Line((-27.595299462, 23.25), (-24.5, 23.25))
            ThreePointArc((-24.5, 23.25), (-21.25, 26.5), (-24.5, 29.75))
        make_face()
        with Locations(Location((-24.5, 26.5, 0), (0, 0, 270))):
            Circle(SKETCH_15_R, mode=Mode.SUBTRACT)
    # profile 3 of 4: a face of its own
    with BuildSketch(Plane.XZ):
        with BuildLine():
            Line((24.5, 23.25), (27.595299462, 23.25))
            Line((27.595299462, 23.25), (27.595299462, 29.75))
            Line((27.595299462, 29.75), (24.5, 29.75))
            ThreePointArc((24.5, 29.75), (21.25, 26.5), (24.5, 23.25))
        make_face()
        with Locations(Location((24.5, 26.5, 0), (0, 0, 90))):
            Circle(SKETCH_15_R, mode=Mode.SUBTRACT)
    # profile 4 of 4: a face of its own
    with BuildSketch(Plane.XZ):
        with BuildLine():
            Line((24.5, -34.75), (27.595299462, -34.75))
            Line((27.595299462, -34.75), (27.595299462, -28.25))
            Line((27.595299462, -28.25), (24.5, -28.25))
            ThreePointArc((24.5, -28.25), (21.25, -31.5), (24.5, -34.75))
        make_face()
        with Locations(Location((24.5, -31.5, 0), (0, 0, 90))):
            Circle(SKETCH_15_R, mode=Mode.SUBTRACT)
    extrude(amount=EXTRUDE_8_DEPTH)

    # 草图16 → 切除-拉伸7 (cut, up to next)
    with BuildSketch(Plane.XZ, mode=Mode.PRIVATE) as cut_extrude_7_sk1:
        with Locations(Location((0, 57.5, 0), (0, 0, 270))):
            Circle(SKETCH_16_R)
    cut_extrude_7_tool1 = extrude(cut_extrude_7_sk1.sketch, amount=-CUT_EXTRUDE_7_REACH, mode=Mode.PRIVATE) & part.part
    # 草图16 → 切除-拉伸7 (cut, up to next)
    with BuildSketch(Plane.XZ, mode=Mode.PRIVATE) as cut_extrude_7_sk2:
        with Locations((-5, -72.5)):
            Rectangle(SKETCH_16_W, SKETCH_16_H)
    cut_extrude_7_tool2 = extrude(cut_extrude_7_sk2.sketch, amount=-CUT_EXTRUDE_7_REACH, mode=Mode.PRIVATE) & part.part
    add(cut_extrude_7_tool1.solids().sort_by_distance((0, 0, 57.5))[0], mode=Mode.SUBTRACT)
    add(cut_extrude_7_tool2.solids().sort_by_distance((-5, 0, -72.5))[0], mode=Mode.SUBTRACT)

    # 草图17 → 切除-拉伸8 (cut, up to next)
    with BuildSketch(Plane.XZ, mode=Mode.PRIVATE) as cut_extrude_8_sk1:
        with Locations(Location((-27, 48.5, 0), (0, 0, 270))):
            Circle(SKETCH_17_R)
    cut_extrude_8_tool1 = extrude(cut_extrude_8_sk1.sketch, amount=-CUT_EXTRUDE_8_REACH, mode=Mode.PRIVATE) & part.part
    # 草图17 → 切除-拉伸8 (cut, up to next)
    with BuildSketch(Plane.XZ, mode=Mode.PRIVATE) as cut_extrude_8_sk2:
        with Locations(Location((27, 48.5, 0), (0, 0, 270))):
            Circle(SKETCH_17_R)
    cut_extrude_8_tool2 = extrude(cut_extrude_8_sk2.sketch, amount=-CUT_EXTRUDE_8_REACH, mode=Mode.PRIVATE) & part.part
    add(cut_extrude_8_tool1.solids().sort_by_distance((-27, 0, 48.5))[0], mode=Mode.SUBTRACT)
    add(cut_extrude_8_tool2.solids().sort_by_distance((27, 0, 48.5))[0], mode=Mode.SUBTRACT)

    # 草图18 → 切除-拉伸9 (cut, up to next)
    with BuildSketch(Plane.XZ, mode=Mode.PRIVATE) as cut_extrude_9_sk1:
        with Locations(Location((44, -0.983974596, 0), (0, 0, 270))):
            Circle(SKETCH_18_R)
    cut_extrude_9_tool1 = extrude(cut_extrude_9_sk1.sketch, amount=-CUT_EXTRUDE_9_REACH, mode=Mode.PRIVATE) & part.part
    # 草图18 → 切除-拉伸9 (cut, up to next)
    with BuildSketch(Plane.XZ, mode=Mode.PRIVATE) as cut_extrude_9_sk2:
        with Locations(Location((44, -8.983974596, 0), (0, 0, 270))):
            Circle(SKETCH_18_R)
    cut_extrude_9_tool2 = extrude(cut_extrude_9_sk2.sketch, amount=-CUT_EXTRUDE_9_REACH, mode=Mode.PRIVATE) & part.part
    add(cut_extrude_9_tool1.solids().sort_by_distance((44, 0, -0.983975))[0], mode=Mode.SUBTRACT)
    add(cut_extrude_9_tool2.solids().sort_by_distance((44, 0, -8.983975))[0], mode=Mode.SUBTRACT)


solid = part.part
